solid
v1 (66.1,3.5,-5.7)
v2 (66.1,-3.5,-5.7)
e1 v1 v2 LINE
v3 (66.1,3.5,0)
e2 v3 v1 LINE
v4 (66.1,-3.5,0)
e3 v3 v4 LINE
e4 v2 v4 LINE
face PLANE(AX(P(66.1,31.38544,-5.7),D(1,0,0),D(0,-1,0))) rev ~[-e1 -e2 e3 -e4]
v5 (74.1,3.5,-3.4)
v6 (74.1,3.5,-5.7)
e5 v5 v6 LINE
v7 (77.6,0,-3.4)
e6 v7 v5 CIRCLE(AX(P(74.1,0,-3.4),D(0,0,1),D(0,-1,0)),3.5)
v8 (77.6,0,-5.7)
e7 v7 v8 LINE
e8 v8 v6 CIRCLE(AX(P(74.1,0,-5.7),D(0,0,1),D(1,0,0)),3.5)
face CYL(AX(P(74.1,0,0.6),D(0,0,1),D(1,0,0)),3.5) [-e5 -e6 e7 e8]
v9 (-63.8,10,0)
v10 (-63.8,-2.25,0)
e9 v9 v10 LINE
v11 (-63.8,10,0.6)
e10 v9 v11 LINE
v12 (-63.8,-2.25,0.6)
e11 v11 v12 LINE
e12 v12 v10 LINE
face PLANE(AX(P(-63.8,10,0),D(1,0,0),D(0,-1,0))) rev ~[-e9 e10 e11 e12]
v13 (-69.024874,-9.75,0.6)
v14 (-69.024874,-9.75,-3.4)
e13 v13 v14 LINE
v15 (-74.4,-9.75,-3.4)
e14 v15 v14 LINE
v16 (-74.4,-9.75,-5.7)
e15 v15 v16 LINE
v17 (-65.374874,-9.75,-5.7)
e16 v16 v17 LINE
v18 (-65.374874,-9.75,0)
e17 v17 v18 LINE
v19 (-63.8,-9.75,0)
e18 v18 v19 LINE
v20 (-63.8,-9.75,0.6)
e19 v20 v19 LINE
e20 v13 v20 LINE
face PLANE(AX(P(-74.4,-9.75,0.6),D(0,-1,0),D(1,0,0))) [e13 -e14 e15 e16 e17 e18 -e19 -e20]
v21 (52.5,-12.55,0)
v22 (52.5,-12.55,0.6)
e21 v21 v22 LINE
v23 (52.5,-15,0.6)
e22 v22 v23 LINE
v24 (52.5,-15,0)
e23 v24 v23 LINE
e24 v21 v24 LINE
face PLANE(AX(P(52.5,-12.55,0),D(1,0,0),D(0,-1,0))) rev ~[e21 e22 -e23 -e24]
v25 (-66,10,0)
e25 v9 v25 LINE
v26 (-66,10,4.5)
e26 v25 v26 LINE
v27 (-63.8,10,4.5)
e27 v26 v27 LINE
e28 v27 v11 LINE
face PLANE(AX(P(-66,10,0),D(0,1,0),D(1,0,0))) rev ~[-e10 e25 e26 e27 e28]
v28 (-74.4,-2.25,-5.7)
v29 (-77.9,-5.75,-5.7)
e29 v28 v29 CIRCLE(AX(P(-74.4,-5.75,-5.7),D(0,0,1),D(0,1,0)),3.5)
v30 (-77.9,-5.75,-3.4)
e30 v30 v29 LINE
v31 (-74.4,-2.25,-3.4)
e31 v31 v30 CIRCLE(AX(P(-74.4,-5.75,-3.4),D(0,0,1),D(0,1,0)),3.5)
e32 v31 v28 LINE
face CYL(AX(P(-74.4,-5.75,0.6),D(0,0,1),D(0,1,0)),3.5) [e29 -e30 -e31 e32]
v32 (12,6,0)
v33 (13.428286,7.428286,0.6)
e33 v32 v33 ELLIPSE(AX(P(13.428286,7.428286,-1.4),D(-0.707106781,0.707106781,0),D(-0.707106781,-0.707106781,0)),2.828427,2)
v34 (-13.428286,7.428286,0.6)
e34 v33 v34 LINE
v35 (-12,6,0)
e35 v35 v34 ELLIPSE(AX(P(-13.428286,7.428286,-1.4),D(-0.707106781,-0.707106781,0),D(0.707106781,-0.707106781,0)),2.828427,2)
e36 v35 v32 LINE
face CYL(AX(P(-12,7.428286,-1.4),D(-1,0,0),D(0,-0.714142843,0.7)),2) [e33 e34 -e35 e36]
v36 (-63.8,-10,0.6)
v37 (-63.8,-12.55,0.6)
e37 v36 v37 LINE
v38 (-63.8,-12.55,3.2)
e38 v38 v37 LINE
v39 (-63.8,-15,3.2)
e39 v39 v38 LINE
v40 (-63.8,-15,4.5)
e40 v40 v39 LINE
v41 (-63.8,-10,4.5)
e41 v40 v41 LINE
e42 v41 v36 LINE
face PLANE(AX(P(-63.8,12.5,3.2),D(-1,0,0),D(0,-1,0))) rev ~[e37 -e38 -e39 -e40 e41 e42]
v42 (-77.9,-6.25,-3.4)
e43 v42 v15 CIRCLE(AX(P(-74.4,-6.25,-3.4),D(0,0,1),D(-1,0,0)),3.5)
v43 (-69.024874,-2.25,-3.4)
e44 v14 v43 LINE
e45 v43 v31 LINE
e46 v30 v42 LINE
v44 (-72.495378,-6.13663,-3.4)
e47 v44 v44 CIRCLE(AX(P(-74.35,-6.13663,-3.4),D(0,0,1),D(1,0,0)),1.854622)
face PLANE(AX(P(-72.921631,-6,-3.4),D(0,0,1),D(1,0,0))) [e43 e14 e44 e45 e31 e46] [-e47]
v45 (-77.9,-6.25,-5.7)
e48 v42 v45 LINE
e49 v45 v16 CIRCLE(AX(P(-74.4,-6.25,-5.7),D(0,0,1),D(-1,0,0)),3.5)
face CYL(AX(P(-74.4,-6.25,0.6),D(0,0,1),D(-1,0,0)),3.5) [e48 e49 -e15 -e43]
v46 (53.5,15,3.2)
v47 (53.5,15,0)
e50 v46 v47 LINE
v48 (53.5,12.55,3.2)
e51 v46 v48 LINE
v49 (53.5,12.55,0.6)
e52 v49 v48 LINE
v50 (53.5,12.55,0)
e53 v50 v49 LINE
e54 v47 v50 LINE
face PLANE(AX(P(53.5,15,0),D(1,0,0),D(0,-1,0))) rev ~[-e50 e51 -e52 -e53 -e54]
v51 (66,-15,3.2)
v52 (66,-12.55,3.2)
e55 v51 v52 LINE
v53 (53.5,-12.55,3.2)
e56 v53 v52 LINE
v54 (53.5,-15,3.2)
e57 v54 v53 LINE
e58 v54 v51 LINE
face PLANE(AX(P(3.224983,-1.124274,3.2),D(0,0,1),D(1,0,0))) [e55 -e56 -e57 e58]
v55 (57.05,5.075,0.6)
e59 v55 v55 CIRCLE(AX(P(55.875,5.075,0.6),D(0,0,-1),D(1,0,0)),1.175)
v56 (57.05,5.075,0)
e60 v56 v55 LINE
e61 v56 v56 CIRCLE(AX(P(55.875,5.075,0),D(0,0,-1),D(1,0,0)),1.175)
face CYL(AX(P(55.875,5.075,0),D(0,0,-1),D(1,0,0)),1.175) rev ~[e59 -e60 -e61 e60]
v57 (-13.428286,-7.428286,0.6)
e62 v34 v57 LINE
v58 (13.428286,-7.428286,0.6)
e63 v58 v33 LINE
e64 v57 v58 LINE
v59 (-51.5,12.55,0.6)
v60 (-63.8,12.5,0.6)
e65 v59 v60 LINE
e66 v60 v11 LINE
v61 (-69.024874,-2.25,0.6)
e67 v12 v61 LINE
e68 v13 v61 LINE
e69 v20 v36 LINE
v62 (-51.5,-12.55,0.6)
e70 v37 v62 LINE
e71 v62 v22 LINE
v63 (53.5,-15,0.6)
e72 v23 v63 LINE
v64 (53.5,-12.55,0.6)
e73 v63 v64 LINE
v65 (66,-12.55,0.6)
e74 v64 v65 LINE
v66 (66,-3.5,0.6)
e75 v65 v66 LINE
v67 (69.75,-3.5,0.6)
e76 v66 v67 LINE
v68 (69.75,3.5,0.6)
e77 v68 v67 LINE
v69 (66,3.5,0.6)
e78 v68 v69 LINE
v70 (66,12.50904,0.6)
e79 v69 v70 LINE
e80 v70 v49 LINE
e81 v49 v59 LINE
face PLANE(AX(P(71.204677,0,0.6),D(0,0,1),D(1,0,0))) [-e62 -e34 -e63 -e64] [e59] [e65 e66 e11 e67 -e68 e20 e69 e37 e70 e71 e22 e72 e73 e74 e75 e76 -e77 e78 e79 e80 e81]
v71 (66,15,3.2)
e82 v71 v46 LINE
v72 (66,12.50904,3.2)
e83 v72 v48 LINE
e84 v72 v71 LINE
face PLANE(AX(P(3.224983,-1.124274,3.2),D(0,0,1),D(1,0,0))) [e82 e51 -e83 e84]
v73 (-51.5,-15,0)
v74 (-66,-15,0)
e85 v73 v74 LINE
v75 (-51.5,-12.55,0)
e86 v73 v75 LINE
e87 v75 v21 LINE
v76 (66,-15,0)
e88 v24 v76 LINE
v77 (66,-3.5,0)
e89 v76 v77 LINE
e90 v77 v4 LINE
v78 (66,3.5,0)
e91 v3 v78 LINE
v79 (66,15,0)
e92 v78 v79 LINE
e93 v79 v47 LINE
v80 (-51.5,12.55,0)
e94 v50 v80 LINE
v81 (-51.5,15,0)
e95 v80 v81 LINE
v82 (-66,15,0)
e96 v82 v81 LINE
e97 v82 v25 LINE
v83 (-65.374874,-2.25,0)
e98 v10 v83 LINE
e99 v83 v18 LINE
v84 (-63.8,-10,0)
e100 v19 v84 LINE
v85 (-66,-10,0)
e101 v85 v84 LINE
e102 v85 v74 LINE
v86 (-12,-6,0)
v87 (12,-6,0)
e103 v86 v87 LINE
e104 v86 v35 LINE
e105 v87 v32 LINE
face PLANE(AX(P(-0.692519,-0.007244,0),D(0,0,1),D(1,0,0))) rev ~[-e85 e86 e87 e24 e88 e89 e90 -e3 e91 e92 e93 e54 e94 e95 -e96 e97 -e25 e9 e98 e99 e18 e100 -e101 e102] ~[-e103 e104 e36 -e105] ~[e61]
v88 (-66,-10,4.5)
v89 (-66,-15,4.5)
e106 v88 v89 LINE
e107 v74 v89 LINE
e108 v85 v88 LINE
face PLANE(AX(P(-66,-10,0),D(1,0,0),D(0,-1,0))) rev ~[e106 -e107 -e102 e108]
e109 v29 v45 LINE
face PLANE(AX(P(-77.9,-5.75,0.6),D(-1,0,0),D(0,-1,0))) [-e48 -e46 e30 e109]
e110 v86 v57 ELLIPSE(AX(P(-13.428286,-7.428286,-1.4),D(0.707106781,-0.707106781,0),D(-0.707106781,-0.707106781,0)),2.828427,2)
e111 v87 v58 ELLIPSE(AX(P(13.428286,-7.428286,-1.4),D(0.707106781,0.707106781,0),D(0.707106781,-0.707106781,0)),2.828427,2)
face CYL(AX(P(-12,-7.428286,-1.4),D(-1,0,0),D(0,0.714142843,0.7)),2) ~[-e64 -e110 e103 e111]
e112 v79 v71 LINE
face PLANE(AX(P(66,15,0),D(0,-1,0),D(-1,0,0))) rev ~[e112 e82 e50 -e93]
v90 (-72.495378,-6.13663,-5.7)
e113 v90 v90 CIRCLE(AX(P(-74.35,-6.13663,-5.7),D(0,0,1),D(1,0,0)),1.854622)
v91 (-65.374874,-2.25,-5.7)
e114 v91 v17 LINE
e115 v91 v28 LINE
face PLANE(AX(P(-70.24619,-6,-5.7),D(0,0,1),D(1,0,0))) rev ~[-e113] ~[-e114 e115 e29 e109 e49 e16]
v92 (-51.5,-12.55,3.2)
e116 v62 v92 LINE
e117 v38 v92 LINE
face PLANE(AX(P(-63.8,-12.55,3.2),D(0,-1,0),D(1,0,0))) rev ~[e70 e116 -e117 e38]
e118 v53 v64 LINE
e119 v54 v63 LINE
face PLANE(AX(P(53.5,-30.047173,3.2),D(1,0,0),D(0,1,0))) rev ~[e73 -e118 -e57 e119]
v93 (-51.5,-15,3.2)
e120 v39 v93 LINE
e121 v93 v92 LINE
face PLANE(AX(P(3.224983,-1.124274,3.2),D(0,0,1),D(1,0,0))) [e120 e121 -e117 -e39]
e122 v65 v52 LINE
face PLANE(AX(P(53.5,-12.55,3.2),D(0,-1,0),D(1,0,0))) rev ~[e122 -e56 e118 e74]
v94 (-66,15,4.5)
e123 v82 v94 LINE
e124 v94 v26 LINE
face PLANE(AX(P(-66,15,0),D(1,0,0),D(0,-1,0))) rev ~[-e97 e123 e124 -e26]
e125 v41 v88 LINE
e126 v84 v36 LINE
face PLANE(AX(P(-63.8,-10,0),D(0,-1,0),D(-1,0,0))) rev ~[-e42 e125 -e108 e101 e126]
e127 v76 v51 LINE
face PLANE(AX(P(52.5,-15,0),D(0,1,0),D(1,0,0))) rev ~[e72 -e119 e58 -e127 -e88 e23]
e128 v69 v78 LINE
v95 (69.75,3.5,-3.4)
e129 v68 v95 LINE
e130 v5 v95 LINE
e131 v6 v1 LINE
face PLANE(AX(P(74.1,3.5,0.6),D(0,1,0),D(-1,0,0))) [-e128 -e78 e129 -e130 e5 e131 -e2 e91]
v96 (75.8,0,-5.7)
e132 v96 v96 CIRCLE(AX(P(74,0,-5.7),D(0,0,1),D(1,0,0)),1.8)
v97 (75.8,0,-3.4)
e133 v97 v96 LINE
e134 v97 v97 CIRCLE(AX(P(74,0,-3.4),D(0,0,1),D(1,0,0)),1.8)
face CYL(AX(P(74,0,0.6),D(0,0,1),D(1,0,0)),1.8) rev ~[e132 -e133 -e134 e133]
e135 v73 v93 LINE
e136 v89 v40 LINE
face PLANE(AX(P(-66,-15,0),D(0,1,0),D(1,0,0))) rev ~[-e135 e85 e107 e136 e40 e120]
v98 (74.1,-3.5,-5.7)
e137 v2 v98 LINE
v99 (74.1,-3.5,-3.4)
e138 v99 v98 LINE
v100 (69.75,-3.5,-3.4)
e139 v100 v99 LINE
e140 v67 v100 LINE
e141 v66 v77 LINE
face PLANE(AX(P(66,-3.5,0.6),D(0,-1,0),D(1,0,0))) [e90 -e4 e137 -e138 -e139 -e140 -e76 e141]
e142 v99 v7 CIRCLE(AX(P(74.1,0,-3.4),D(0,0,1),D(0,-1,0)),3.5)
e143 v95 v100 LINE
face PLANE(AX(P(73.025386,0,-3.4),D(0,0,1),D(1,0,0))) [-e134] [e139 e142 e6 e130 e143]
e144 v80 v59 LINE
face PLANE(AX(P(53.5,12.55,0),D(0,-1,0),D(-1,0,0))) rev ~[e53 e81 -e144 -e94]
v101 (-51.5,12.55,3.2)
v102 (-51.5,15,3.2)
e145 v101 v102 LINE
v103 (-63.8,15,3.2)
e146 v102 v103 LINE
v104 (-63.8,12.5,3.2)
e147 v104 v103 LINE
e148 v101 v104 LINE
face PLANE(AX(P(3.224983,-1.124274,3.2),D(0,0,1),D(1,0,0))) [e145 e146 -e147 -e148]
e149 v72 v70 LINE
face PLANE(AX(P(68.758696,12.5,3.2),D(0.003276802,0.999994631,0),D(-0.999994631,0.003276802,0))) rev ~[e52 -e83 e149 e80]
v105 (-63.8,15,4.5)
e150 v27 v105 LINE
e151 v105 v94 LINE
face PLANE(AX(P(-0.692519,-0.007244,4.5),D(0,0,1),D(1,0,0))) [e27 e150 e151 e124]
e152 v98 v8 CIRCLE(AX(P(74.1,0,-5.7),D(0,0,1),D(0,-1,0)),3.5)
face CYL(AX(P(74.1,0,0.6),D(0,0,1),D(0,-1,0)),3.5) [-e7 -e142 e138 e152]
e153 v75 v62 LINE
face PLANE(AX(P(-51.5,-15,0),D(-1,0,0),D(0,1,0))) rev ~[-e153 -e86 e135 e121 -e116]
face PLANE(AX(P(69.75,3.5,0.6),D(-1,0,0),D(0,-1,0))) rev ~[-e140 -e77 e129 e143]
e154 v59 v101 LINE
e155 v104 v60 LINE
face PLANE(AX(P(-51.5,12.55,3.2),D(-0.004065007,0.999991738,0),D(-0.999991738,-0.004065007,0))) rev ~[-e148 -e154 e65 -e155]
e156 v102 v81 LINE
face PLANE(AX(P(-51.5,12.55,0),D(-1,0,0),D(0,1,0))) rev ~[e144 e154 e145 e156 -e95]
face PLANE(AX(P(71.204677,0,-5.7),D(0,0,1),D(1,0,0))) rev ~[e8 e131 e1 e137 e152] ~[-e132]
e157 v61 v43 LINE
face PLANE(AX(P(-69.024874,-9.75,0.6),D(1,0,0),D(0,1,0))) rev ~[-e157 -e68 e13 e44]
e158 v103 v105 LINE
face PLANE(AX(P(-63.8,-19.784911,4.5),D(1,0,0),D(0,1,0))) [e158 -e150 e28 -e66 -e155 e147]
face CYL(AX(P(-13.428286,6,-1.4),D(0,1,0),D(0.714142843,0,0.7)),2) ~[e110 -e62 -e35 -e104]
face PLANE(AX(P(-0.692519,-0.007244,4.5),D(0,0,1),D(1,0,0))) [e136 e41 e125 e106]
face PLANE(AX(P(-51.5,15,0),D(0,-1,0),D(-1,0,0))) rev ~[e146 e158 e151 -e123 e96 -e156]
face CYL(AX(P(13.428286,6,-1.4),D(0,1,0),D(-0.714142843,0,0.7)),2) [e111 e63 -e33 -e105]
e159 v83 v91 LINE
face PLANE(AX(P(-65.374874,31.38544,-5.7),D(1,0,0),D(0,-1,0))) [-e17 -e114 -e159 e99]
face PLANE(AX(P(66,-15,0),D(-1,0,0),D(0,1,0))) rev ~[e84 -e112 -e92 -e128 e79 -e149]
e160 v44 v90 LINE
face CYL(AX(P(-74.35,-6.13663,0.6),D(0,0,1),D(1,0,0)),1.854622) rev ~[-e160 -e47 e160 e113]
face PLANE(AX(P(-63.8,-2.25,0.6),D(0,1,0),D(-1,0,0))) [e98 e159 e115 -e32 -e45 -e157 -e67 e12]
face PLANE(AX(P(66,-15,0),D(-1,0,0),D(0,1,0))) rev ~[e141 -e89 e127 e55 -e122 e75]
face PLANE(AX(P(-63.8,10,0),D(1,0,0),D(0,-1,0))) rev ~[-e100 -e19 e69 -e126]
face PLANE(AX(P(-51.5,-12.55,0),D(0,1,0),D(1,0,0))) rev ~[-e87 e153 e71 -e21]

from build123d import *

# Parameters (mm, degrees)
F0_W          = 24
F0_H          = 12
F1_DEPTH      = 4.5
F2_W          = 134.0499658869
F2_H          = 37.3212727123
F3_DEPTH      = 1.3
F5_DEPTH      = 2.6
F6_R          = 1.8
F6_R_2        = 1.8546222436
F7_DEPTH      = 6.3
F8_W          = 131.4748737342
F8_H          = 57.6514146297
F9_DEPTH      = 5.7
F10_R         = 1.175
F11_DEPTH     = 2
F12_R         = 1.8546222436
F12_R_2       = 1.8
F13_DEPTH     = 4
F14_T1_DEPTH  = 24
F14_T3_DEPTH  = 12
F14_T9_DEPTH  = 15.5707142143
F14_T13_DEPTH = 27.5707142143
F14_T20_DEPTH = 27.5707142143
F14_T24_DEPTH = 15.5707142143
F14_T31_DEPTH = 15.5707142143
F14_T35_DEPTH = 27.5707142143
F14_T42_DEPTH = 27.5707142143
F14_T46_DEPTH = 15.5707142143


# Not quite as in the source:
# - a fillet or chamfer that OpenCascade refuses, or shapes differently, is made with other operations: its cross-section is extruded or revolved along the edge and cut away or added


with BuildPart() as f1:
    # F0 (on Top) → F1 (new body)
    with BuildSketch(Plane.XY):
        Polygon((-51.5, 15), (-66, 15), (-66, 10), (-63.8, 10), (-63.8, -10), (-66, -10), (-66, -15), (-51.5, -15), (-51.5, -12.55), (52.5, -12.55), (52.5, -15), (66, -15), (66, 15), (53.5, 15), (53.5, 12.55), (-51.5, 12.55), align=None)
        Rectangle(F0_W, F0_H, mode=Mode.SUBTRACT)
    extrude(amount=F1_DEPTH)

    # F2 (on face) → F3 (cut)
    with BuildSketch(Plane.XY.offset(4.5)):
        with Locations((3.2249829435, -1.1242744513)):
            Rectangle(F2_W, F2_H)
    extrude(amount=-F3_DEPTH, mode=Mode.SUBTRACT)

    # F4 (on face) → F5 (cut)
    with BuildSketch(Plane.XY.offset(3.2)):
        Polygon((-63.8, 12.5), (-63.8, -12.55), (-51.5, -12.55), (-51.5, -30.0471726805), (53.5, -30.0471726805), (53.5, -12.55), (68.7586962298, -12.55), (68.7586962298, 12.5), (53.5, 12.55), (53.5, 21.0785120726), (-51.5, 21.0785120726), (-51.5, 12.55), align=None)
    extrude(amount=-F5_DEPTH, mode=Mode.SUBTRACT)

    # F6 (on face) → F7 (join)
    with BuildSketch(Plane.XY.offset(0.6)):
        with BuildLine():
            Line((66, 3.5), (66, -3.5))
            Line((66, -3.5), (74.1, -3.5))
            ThreePointArc((74.1, -3.5), (76.5748737342, -2.4748737342), (77.6, 0))
            ThreePointArc((77.6, 0), (76.5748737342, 2.4748737342), (74.1, 3.5))
            Line((74.1, 3.5), (66, 3.5))
        make_face()
        with Locations((74, 0)):
            Circle(F6_R, mode=Mode.SUBTRACT)
        with BuildLine():
            Line((-74.4, -9.75), (-63.8, -9.75))
            Line((-63.8, -9.75), (-63.8, -2.25))
            Line((-63.8, -2.25), (-74.4, -2.25))
            ThreePointArc((-74.4, -2.25), (-76.8748737342, -3.2751262658), (-77.9, -5.75))
            Line((-77.9, -5.75), (-77.9, -6.25))
            ThreePointArc((-77.9, -6.25), (-76.8748737342, -8.7248737342), (-74.4, -9.75))
        make_face()
        with Locations((-74.35, -6.136629995)):
            Circle(F6_R_2, mode=Mode.SUBTRACT)
    extrude(amount=-F7_DEPTH)

    # F8 (on face) → F9 (cut, through all)
    with BuildSketch(Plane(origin=(0, 0, -5.7), x_dir=(1, 0, 0), z_dir=(0, 0, -1))):
        with Locations((0.3625631329, -2.5597326458)):
            Rectangle(F8_W, F8_H)
    extrude(amount=-F9_DEPTH, mode=Mode.SUBTRACT)

    # F10 (on face) → F11 (cut)
    with BuildSketch(Plane(origin=(0, 0, 0), x_dir=(1, 0, 0), z_dir=(0, 0, -1))):
        with Locations((55.875, -5.075)):
            Circle(F10_R)
    extrude(amount=-F11_DEPTH, mode=Mode.SUBTRACT)

    # F12 (on face) → F13 (cut)
    with BuildSketch(Plane.XY.offset(0.6)):
        with BuildLine():
            Line((-69.0248737342, -9.75), (-69.0248737342, -2.25))
            Line((-69.0248737342, -2.25), (-74.4, -2.25))
            ThreePointArc((-74.4, -2.25), (-76.8748737342, -3.2751262658), (-77.9, -5.75))
            Line((-77.9, -5.75), (-77.9, -6.25))
            ThreePointArc((-77.9, -6.25), (-76.8748737342, -8.7248737342), (-74.4, -9.75))
            Line((-74.4, -9.75), (-69.0248737342, -9.75))
        make_face()
        with Locations((-74.35, -6.136629995)):
            Circle(F12_R, mode=Mode.SUBTRACT)
        with BuildLine():
            Line((74.1, 3.5), (69.75, 3.5))
            Line((69.75, 3.5), (69.75, -3.5))
            Line((69.75, -3.5), (74.1, -3.5))
            ThreePointArc((74.1, -3.5), (77.6, 0), (74.1, 3.5))
        make_face()
        with Locations((74, 0)):
            Circle(F12_R_2, mode=Mode.SUBTRACT)
    extrude(amount=-F13_DEPTH, mode=Mode.SUBTRACT)

    # F14: fillet of radius 2 on 4 edges, made by hand

    # F14_s2 → F14_t1 (cut)
    with BuildSketch(Plane.YZ.offset(-12)):
        with BuildLine():
            ThreePointArc((6, 0), (6.6536890165, 0.4439088915), (7.4282856857, 0.6))
            Line((7.4282856857, 0.6), (6, 0.6))
            Line((6, 0.6), (6, 0))
        make_face()
        with BuildLine():
            ThreePointArc((-6, 0), (-6.6536890165, 0.4439088915), (-7.4282856857, 0.6))
            Line((-7.4282856857, 0.6), (-6, 0.6))
            Line((-6, 0.6), (-6, 0))
        make_face()
    extrude(amount=F14_T1_DEPTH, mode=Mode.SUBTRACT)

    # F14_s4 → F14_t3 (cut)
    with BuildSketch(Plane.XZ.offset(-6)):
        with BuildLine():
            ThreePointArc((-12, 0), (-12.6536890165, 0.4439088915), (-13.4282856857, 0.6))
            Line((-13.4282856857, 0.6), (-12, 0.6))
            Line((-12, 0.6), (-12, 0))
        make_face()
        with BuildLine():
            ThreePointArc((12, 0), (12.6536890165, 0.4439088915), (13.4282856857, 0.6))
            Line((13.4282856857, 0.6), (12, 0.6))
            Line((12, 0.6), (12, 0))
        make_face()
    extrude(amount=F14_T3_DEPTH, mode=Mode.SUBTRACT)


with BuildPart() as f14_tool7:
    # F14_s8 → F14_t9 (new body)
    with BuildSketch(Plane.XZ.offset(6)):
        with BuildLine():
            ThreePointArc((-12, 0), (-12.6536890165, 0.4439088915), (-13.4282856857, 0.6))
            Line((-13.4282856857, 0.6), (-12, 0.6))
            Line((-12, 0.6), (-12, 0))
        make_face()
    extrude(amount=-F14_T9_DEPTH)

    split(bisect_by=Plane.XZ.offset(-6), keep=Keep.BOTTOM)


with BuildPart() as f14_tool11:
    # F14_s12 → F14_t13 (new body)
    with BuildSketch(Plane.YZ.offset(-15.5707142143)):
        with BuildLine():
            ThreePointArc((6, 0), (6.6536890165, 0.4439088915), (7.4282856857, 0.6))
            Line((7.4282856857, 0.6), (6, 0.6))
            Line((6, 0.6), (6, 0))
        make_face()
    extrude(amount=F14_T13_DEPTH)

    split(bisect_by=Plane.YZ.offset(-12), keep=Keep.BOTTOM)


with BuildPart() as f14_tool7_1:
    add(f14_tool7.part)

    # F14_t15: intersect F14_tool11
    add(f14_tool11.part, mode=Mode.INTERSECT)


with BuildPart() as f1_1:
    add(f1.part)

    # F14_t5: cut F14_tool7
    add(f14_tool7_1.part, mode=Mode.SUBTRACT)


with BuildPart() as f14_tool18:
    # F14_s19 → F14_t20 (new body)
    with BuildSketch(Plane.YZ.offset(-12)):
        with BuildLine():
            ThreePointArc((6, 0), (6.6536890165, 0.4439088915), (7.4282856857, 0.6))
            Line((7.4282856857, 0.6), (6, 0.6))
            Line((6, 0.6), (6, 0))
        make_face()
    extrude(amount=F14_T20_DEPTH)

    split(bisect_by=Plane.YZ.offset(12), keep=Keep.TOP)


with BuildPart() as f14_tool22:
    # F14_s23 → F14_t24 (new body)
    with BuildSketch(Plane.XZ.offset(-9.5707142143)):
        with BuildLine():
            ThreePointArc((12, 0), (12.6536890165, 0.4439088915), (13.4282856857, 0.6))
            Line((13.4282856857, 0.6), (12, 0.6))
            Line((12, 0.6), (12, 0))
        make_face()
    extrude(amount=F14_T24_DEPTH)

    split(bisect_by=Plane.XZ.offset(-6), keep=Keep.BOTTOM)


with BuildPart() as f14_tool18_1:
    add(f14_tool18.part)

    # F14_t26: intersect F14_tool22
    add(f14_tool22.part, mode=Mode.INTERSECT)


with BuildPart() as f1_2:
    add(f1_1.part)

    # F14_t16: cut F14_tool18
    add(f14_tool18_1.part, mode=Mode.SUBTRACT)


with BuildPart() as f14_tool29:
    # F14_s30 → F14_t31 (new body)
    with BuildSketch(Plane.XZ.offset(9.5707142143)):
        with BuildLine():
            ThreePointArc((-12, 0), (-12.6536890165, 0.4439088915), (-13.4282856857, 0.6))
            Line((-13.4282856857, 0.6), (-12, 0.6))
            Line((-12, 0.6), (-12, 0))
        make_face()
    extrude(amount=-F14_T31_DEPTH)

    split(bisect_by=Plane.XZ.offset(6), keep=Keep.TOP)


with BuildPart() as f14_tool33:
    # F14_s34 → F14_t35 (new body)
    with BuildSketch(Plane.YZ.offset(12)):
        with BuildLine():
            ThreePointArc((-6, 0), (-6.6536890165, 0.4439088915), (-7.4282856857, 0.6))
            Line((-7.4282856857, 0.6), (-6, 0.6))
            Line((-6, 0.6), (-6, 0))
        make_face()
    extrude(amount=-F14_T35_DEPTH)

    split(bisect_by=Plane.YZ.offset(-12), keep=Keep.BOTTOM)


with BuildPart() as f14_tool29_1:
    add(f14_tool29.part)

    # F14_t37: intersect F14_tool33
    add(f14_tool33.part, mode=Mode.INTERSECT)


with BuildPart() as f1_3:
    add(f1_2.part)

    # F14_t27: cut F14_tool29
    add(f14_tool29_1.part, mode=Mode.SUBTRACT)


with BuildPart() as f14_tool40:
    # F14_s41 → F14_t42 (new body)
    with BuildSketch(Plane.YZ.offset(15.5707142143)):
        with BuildLine():
            ThreePointArc((-6, 0), (-6.6536890165, 0.4439088915), (-7.4282856857, 0.6))
            Line((-7.4282856857, 0.6), (-6, 0.6))
            Line((-6, 0.6), (-6, 0))
        make_face()
    extrude(amount=-F14_T42_DEPTH)

    split(bisect_by=Plane.YZ.offset(12), keep=Keep.TOP)


with BuildPart() as f14_tool44:
    # F14_s45 → F14_t46 (new body)
    with BuildSketch(Plane.XZ.offset(-6)):
        with BuildLine():
            ThreePointArc((12, 0), (12.6536890165, 0.4439088915), (13.4282856857, 0.6))
            Line((13.4282856857, 0.6), (12, 0.6))
            Line((12, 0.6), (12, 0))
        make_face()
    extrude(amount=F14_T46_DEPTH)

    split(bisect_by=Plane.XZ.offset(6), keep=Keep.TOP)


with BuildPart() as f14_tool40_1:
    add(f14_tool40.part)

    # F14_t48: intersect F14_tool44
    add(f14_tool44.part, mode=Mode.INTERSECT)


with BuildPart() as f1_4:
    add(f1_3.part)

    # F14_t38: cut F14_tool40
    add(f14_tool40_1.part, mode=Mode.SUBTRACT)


solid = f1_4.part
